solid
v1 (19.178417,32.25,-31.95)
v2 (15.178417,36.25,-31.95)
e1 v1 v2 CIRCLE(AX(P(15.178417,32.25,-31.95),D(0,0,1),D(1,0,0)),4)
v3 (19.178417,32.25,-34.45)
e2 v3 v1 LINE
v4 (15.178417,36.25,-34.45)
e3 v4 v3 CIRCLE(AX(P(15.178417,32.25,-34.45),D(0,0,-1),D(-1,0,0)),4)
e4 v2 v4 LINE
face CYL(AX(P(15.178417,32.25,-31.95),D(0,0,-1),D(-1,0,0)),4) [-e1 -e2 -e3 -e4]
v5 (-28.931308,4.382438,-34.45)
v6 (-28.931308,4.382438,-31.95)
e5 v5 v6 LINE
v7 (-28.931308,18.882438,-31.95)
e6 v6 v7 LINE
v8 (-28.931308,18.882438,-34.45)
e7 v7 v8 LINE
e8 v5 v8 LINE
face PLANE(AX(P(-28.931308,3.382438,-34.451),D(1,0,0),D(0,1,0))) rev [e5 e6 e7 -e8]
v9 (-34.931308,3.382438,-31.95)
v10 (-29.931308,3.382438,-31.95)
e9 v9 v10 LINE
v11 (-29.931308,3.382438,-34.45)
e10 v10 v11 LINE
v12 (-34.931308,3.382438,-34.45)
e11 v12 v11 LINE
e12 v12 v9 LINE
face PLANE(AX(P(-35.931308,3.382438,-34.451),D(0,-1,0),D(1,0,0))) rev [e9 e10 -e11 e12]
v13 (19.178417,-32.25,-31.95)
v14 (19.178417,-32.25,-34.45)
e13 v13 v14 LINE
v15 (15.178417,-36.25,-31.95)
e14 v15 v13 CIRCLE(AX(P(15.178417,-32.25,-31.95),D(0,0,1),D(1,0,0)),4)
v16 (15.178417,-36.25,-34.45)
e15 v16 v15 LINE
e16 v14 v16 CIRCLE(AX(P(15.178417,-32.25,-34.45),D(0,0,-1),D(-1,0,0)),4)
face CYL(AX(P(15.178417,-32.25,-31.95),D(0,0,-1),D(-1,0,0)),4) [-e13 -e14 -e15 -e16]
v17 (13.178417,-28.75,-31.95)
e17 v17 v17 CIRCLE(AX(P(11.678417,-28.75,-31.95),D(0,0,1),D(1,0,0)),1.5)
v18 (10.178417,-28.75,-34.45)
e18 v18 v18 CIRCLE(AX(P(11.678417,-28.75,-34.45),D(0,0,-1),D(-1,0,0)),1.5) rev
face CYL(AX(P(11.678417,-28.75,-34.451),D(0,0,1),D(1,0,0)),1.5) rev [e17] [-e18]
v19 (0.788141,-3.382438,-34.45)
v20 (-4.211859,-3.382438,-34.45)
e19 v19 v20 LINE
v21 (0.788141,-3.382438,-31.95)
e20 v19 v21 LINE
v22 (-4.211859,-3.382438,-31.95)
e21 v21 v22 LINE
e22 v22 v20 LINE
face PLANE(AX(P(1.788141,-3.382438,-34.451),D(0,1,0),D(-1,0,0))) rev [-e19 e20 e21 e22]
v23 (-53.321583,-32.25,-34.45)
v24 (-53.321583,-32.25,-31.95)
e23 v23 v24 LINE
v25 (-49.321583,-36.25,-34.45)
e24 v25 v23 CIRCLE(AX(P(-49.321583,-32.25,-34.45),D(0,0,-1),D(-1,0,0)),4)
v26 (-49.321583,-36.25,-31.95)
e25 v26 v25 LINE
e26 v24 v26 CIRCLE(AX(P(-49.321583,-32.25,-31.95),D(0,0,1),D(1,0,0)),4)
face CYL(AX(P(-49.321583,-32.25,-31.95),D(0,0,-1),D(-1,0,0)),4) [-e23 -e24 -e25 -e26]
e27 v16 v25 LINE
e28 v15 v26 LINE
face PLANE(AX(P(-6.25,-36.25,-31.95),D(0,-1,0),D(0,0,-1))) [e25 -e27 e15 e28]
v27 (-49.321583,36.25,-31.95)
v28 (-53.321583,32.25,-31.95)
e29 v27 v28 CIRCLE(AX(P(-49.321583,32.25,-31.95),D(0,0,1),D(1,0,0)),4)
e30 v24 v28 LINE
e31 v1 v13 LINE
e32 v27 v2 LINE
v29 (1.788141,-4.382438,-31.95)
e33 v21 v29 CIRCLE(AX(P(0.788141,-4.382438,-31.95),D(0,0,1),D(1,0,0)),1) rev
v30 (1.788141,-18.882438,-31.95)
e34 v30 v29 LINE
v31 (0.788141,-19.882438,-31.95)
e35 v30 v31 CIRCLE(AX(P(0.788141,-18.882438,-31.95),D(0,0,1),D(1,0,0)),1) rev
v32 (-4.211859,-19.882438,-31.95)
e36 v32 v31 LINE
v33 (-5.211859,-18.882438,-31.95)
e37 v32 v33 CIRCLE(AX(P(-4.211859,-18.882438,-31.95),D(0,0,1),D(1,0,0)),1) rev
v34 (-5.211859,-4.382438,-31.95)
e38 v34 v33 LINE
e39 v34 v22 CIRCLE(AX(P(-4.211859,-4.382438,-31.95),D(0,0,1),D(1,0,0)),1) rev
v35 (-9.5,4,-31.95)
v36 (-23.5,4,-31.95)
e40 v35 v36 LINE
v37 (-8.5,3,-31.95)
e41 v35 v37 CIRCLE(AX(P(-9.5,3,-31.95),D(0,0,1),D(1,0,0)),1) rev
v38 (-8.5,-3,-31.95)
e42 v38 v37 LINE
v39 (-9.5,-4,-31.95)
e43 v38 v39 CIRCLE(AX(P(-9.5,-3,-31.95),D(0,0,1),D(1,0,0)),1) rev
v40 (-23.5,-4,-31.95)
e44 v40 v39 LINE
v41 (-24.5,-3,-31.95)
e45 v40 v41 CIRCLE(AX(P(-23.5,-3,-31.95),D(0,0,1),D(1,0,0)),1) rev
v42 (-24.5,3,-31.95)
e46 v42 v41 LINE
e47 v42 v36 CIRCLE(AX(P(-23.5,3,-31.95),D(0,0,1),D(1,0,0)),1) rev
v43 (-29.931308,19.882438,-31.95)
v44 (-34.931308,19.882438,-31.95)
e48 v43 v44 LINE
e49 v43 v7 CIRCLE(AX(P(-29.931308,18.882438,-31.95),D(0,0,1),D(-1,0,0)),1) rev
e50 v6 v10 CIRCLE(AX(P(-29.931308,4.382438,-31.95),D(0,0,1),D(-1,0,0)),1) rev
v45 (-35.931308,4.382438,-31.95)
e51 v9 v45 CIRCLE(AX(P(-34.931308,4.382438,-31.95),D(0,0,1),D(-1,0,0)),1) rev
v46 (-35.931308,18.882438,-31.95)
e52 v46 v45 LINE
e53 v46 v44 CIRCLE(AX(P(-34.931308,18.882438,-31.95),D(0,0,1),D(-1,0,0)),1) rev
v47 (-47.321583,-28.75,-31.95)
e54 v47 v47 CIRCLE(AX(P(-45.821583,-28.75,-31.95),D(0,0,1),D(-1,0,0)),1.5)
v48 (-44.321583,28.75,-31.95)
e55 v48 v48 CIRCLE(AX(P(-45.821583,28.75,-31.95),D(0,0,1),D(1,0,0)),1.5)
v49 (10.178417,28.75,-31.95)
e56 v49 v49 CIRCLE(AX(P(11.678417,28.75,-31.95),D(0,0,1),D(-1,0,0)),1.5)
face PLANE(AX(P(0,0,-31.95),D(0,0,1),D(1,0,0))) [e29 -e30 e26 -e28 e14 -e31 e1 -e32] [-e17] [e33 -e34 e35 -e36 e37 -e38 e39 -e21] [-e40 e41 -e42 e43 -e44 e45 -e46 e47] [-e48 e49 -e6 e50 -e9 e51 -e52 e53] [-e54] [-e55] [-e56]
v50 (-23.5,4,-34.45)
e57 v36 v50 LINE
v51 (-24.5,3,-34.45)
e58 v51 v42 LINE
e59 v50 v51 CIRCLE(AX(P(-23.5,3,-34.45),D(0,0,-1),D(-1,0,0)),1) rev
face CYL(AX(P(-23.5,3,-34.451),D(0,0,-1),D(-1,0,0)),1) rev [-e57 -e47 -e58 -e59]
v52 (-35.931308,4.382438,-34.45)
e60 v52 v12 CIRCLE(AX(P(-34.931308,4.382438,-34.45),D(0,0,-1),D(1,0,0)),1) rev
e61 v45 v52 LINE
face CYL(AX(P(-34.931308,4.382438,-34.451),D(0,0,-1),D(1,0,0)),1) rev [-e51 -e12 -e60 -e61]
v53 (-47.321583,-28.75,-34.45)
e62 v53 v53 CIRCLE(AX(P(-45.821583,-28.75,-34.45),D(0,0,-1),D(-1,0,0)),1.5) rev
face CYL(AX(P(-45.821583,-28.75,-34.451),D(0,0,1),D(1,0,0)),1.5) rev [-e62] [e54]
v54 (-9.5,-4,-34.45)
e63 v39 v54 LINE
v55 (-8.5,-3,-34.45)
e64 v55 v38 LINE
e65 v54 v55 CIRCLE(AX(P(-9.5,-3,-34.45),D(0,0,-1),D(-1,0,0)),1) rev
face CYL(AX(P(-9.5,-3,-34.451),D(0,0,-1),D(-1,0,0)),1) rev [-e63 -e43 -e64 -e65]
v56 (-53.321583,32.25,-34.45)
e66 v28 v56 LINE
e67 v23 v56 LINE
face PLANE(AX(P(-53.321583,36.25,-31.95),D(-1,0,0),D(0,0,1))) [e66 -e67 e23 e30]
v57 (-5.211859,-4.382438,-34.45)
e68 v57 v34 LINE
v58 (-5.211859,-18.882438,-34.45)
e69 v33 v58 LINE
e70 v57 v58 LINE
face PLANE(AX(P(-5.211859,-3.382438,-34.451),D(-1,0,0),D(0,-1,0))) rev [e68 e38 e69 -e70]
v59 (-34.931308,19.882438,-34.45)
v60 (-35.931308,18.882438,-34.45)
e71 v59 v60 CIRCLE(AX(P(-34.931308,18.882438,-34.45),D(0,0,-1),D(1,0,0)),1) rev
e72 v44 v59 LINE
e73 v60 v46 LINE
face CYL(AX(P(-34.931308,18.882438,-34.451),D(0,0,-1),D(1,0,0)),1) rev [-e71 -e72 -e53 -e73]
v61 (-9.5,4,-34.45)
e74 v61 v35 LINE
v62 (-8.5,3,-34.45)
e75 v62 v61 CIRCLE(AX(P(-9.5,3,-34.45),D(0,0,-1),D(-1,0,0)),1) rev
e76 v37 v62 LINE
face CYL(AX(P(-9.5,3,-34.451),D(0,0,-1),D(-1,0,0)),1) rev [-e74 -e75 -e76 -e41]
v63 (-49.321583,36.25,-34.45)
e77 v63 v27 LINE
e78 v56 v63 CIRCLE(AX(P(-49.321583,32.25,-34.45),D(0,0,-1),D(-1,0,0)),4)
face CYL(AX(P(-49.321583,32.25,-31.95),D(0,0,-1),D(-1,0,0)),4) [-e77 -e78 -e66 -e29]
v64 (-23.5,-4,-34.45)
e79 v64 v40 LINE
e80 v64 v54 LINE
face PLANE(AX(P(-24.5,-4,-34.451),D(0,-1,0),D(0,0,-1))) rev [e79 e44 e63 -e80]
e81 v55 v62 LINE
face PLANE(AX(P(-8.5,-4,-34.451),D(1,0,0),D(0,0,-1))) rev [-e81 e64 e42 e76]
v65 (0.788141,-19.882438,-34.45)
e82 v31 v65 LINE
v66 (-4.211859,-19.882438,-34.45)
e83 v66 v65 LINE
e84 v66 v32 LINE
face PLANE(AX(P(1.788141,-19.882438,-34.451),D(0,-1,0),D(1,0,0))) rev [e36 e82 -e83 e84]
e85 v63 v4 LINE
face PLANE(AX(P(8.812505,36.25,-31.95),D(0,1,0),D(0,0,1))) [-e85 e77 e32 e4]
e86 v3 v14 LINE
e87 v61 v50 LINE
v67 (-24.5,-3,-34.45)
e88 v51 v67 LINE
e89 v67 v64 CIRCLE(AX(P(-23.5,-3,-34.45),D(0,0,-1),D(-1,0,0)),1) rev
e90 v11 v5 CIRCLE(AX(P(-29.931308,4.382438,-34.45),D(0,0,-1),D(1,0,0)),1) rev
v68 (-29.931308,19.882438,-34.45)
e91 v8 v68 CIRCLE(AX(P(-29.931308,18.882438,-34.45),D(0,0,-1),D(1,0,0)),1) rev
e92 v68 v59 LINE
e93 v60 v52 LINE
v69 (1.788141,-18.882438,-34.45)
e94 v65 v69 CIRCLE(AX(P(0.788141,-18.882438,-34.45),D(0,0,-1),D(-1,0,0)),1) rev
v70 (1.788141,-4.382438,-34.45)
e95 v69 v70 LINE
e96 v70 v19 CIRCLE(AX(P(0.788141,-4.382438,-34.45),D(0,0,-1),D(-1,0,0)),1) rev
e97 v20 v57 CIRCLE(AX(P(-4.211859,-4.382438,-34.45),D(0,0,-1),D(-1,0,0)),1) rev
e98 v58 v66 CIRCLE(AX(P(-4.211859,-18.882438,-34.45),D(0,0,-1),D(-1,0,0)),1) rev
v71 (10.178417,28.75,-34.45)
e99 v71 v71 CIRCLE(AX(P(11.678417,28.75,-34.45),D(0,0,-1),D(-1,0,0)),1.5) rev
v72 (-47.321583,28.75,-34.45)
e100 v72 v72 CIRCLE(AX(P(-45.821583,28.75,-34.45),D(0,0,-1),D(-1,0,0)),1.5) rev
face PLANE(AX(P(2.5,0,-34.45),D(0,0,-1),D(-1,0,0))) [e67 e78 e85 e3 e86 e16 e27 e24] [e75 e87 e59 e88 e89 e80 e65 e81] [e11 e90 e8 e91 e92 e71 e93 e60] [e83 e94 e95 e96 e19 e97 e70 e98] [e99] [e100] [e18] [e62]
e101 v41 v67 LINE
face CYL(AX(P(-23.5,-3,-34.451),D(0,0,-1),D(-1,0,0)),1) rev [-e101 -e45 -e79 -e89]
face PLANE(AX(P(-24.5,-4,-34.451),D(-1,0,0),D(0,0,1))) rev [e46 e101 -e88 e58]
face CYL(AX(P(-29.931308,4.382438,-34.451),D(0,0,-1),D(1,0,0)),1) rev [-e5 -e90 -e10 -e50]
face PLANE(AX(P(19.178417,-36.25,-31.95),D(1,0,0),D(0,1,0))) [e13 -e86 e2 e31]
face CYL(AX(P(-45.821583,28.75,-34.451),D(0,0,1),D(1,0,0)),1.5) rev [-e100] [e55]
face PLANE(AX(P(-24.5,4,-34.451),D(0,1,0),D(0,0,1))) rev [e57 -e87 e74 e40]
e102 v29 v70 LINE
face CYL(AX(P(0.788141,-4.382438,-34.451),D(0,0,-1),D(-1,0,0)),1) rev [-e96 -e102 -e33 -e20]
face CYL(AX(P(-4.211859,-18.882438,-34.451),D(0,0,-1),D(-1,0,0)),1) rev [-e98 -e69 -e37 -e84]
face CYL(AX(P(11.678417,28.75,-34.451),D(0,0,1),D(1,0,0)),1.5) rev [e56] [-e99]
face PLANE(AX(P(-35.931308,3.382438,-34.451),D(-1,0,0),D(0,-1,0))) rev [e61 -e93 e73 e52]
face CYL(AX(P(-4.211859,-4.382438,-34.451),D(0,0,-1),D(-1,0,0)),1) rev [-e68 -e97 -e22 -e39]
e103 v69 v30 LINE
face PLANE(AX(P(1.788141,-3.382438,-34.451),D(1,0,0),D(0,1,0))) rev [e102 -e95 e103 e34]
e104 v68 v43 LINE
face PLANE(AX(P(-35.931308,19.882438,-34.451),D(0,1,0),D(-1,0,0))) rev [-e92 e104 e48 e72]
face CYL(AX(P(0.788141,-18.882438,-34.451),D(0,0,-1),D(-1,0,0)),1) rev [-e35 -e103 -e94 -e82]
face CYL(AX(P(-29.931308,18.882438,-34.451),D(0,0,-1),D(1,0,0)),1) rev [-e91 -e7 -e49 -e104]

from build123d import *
from build123d.topology import SkipClean

# Parameters (mm, degrees)
SKETCH1_R                = 1.5
BOSS_EXTRUDE1_DEPTH      = 2.5
BOSS_EXTRUDE2_DEPTH      = 1.8
BOSS_EXTRUDE2_DEPTH_BACK = 2.5
SKETCH2_R                = 4.5
SKETCH2_R_2              = 1.5
SKETCH4_R                = 2.5
CUT_EXTRUDE1_DEPTH       = 2
BOSS_EXTRUDE3_START      = 0.75
SKETCH5_R                = 4.5
SKETCH5_R_2              = 2.5
BOSS_EXTRUDE3_DEPTH      = 0.75
BOSS_EXTRUDE4_DEPTH      = 2.5
CUT_EXTRUDE2_REACH       = 80.314
SKETCH7_R                = 1.5
SKETCH7_W                = 7
SKETCH7_H                = 16.5
SKETCH7_W_2              = 16
SKETCH7_H_2              = 8
CUT_EXTRUDE3_REACH       = 82.041
SKETCH9_W                = 2.5
SKETCH9_H                = 22.388822383
BOSS_EXTRUDE5_DEPTH      = 12.5
FILLET1_R                = 4
FILLET2_R                = 1
FILLET3_R                = 4
CUT_EXTRUDE4_DEPTH       = 74.103052287
CUT_EXTRUDE4_DEPTH_BACK  = 74.103052287
SKETCH10_W               = 26.624352611
SKETCH10_H               = 48.524798022
CIRPATTERN1_START        = -34.45
CIRPATTERN1_DEPTH        = 2.5


# Read off the part's stored shape, not the designer's step: CirPattern1
with BuildPart() as part:
    # Sketch1 → Boss-Extrude1 (new body)
    with BuildSketch(Plane(origin=(0, 0, 0), x_dir=(0, 0, -1), z_dir=(1, 0, 0))):
        with BuildLine():
            Line((0, 12.5), (34.45, 12.5))
            Line((34.45, 12.5), (34.45, -12.5))
            Line((34.45, -12.5), (0, -12.5))
            ThreePointArc((0, -12.5), (-12.5, 0), (0, 12.5))
        make_face()
        Circle(SKETCH1_R, mode=Mode.SUBTRACT)
    extrude(amount=BOSS_EXTRUDE1_DEPTH)

    # Sketch2 → Boss-Extrude2 (add, two sides: drawn at the far end of the back side and taken through both)
    with BuildSketch(Plane.ZY.offset(-BOSS_EXTRUDE2_DEPTH_BACK)):
        Circle(SKETCH2_R)
        Circle(SKETCH2_R_2, mode=Mode.SUBTRACT)
    extrude(amount=BOSS_EXTRUDE2_DEPTH + BOSS_EXTRUDE2_DEPTH_BACK)

    # Sketch4 → Cut-Extrude1 (cut)
    with BuildSketch(Plane(origin=(2.5, 0, 0), x_dir=(0, 0, -1), z_dir=(1, 0, 0))):
        Circle(SKETCH4_R)
    extrude(amount=-CUT_EXTRUDE1_DEPTH, mode=Mode.SUBTRACT)

    # Sketch5 → Boss-Extrude3 (add)
    with SkipClean():  # the faces are left unmerged after this step: merging them gives an invalid solid
        with BuildSketch(Plane(origin=(2.5, 0, 0), x_dir=(0, 0, -1), z_dir=(1, 0, 0)).offset(BOSS_EXTRUDE3_START)):
            with Locations(Location((0, 0, 0), (0, 0, 180))):
                Circle(SKETCH5_R)
            Circle(SKETCH5_R_2, mode=Mode.SUBTRACT)
        extrude(amount=-BOSS_EXTRUDE3_DEPTH)

    # Sketch6 → Boss-Extrude4 (add)
    with SkipClean():  # the faces are left unmerged after this step: merging them gives an invalid solid
        with BuildSketch(Plane(origin=(0, 0, -34.45), x_dir=(-1, 0, 0), z_dir=(0, 0, -1))):
            Polygon((-8.812505246, 36.25), (53.321583376, 36.25), (53.321583376, -36.25), (6.25, -36.25), (-19.178416624, -36.25), (-19.178416624, 36.25), align=None)
        extrude(amount=-BOSS_EXTRUDE4_DEPTH)
    add(part.part.scale(1), mode=Mode.REPLACE)  # the faces are merged on a copy

    # Sketch7 → Cut-Extrude2 (cut, up to next)
    with BuildSketch(Plane.XY.offset(-31.95), mode=Mode.PRIVATE) as cut_extrude2_sk1:
        with Locations((11.678416624, -28.75)):
            Circle(SKETCH7_R)
    cut_extrude2_tool1 = extrude(cut_extrude2_sk1.sketch, amount=-CUT_EXTRUDE2_REACH, mode=Mode.PRIVATE) & part.part
    # Sketch7 → Cut-Extrude2 (cut, up to next)
    with BuildSketch(Plane.XY.offset(-31.95), mode=Mode.PRIVATE) as cut_extrude2_sk2:
        with Locations(Location((11.678416624, 28.75, 0), (0, 0, 180))):
            Circle(SKETCH7_R)
    cut_extrude2_tool2 = extrude(cut_extrude2_sk2.sketch, amount=-CUT_EXTRUDE2_REACH, mode=Mode.PRIVATE) & part.part
    # Sketch7 → Cut-Extrude2 (cut, up to next)
    with BuildSketch(Plane.XY.offset(-31.95), mode=Mode.PRIVATE) as cut_extrude2_sk3:
        with Locations((-45.821583376, 28.75)):
            Circle(SKETCH7_R)
    cut_extrude2_tool3 = extrude(cut_extrude2_sk3.sketch, amount=-CUT_EXTRUDE2_REACH, mode=Mode.PRIVATE) & part.part
    # Sketch7 → Cut-Extrude2 (cut, up to next)
    with BuildSketch(Plane.XY.offset(-31.95), mode=Mode.PRIVATE) as cut_extrude2_sk4:
        with Locations(Location((-45.821583376, -28.75, 0), (0, 0, 180))):
            Circle(SKETCH7_R)
    cut_extrude2_tool4 = extrude(cut_extrude2_sk4.sketch, amount=-CUT_EXTRUDE2_REACH, mode=Mode.PRIVATE) & part.part
    # Sketch7 → Cut-Extrude2 (cut, up to next)
    with BuildSketch(Plane.XY.offset(-31.95), mode=Mode.PRIVATE) as cut_extrude2_sk5:
        with Locations((-1.711858899, -11.632438111)):
            Rectangle(SKETCH7_W, SKETCH7_H)
    cut_extrude2_tool5 = extrude(cut_extrude2_sk5.sketch, amount=-CUT_EXTRUDE2_REACH, mode=Mode.PRIVATE) & part.part
    # Sketch7 → Cut-Extrude2 (cut, up to next)
    with BuildSketch(Plane.XY.offset(-31.95), mode=Mode.PRIVATE) as cut_extrude2_sk6:
        with Locations((-16.5, 0)):
            Rectangle(SKETCH7_W_2, SKETCH7_H_2)
    cut_extrude2_tool6 = extrude(cut_extrude2_sk6.sketch, amount=-CUT_EXTRUDE2_REACH, mode=Mode.PRIVATE) & part.part
    add(cut_extrude2_tool1.solids().sort_by_distance((11.678417, -28.75, -31.95))[0], mode=Mode.SUBTRACT)
    add(cut_extrude2_tool2.solids().sort_by_distance((11.678417, 28.75, -31.95))[0], mode=Mode.SUBTRACT)
    add(cut_extrude2_tool3.solids().sort_by_distance((-45.821583, 28.75, -31.95))[0], mode=Mode.SUBTRACT)
    add(cut_extrude2_tool4.solids().sort_by_distance((-45.821583, -28.75, -31.95))[0], mode=Mode.SUBTRACT)
    add(cut_extrude2_tool5.solids().sort_by_distance((-1.711859, -11.632438, -31.95))[0], mode=Mode.SUBTRACT)
    add(cut_extrude2_tool6.solids().sort_by_distance((-16.5, 0, -31.95))[0], mode=Mode.SUBTRACT)

    # Sketch9 → Cut-Extrude3 (cut, up to next)
    with BuildSketch(Plane.XZ.offset(12.5), mode=Mode.PRIVATE) as cut_extrude3_sk1:
        with Locations((1.25, -20.755588809)):
            Rectangle(SKETCH9_W, SKETCH9_H)
    cut_extrude3_tool1 = extrude(cut_extrude3_sk1.sketch, amount=-CUT_EXTRUDE3_REACH, mode=Mode.PRIVATE) & part.part
    add(cut_extrude3_tool1.solids().sort_by_distance((1.25, -12.5, -20.755589))[0], mode=Mode.SUBTRACT)


with BuildPart() as cut_extrude3_piece_1:
    # of the separate pieces the step leaves, piece 1, a body of its own (cut_extrude3_pieces)
    add(part.part.solids().sort_by_distance((-53.321583376, 36.25, -31.95))[0])



with BuildPart() as cut_extrude3_piece_2:
    # of the separate pieces the step leaves, piece 2, a body of its own (cut_extrude3_pieces)
    add(part.part.solids().sort_by_distance((0, 12.5, 0))[0])


with BuildPart() as cut_extrude3_piece_1_1:
    add(cut_extrude3_piece_1.part)

    add(cut_extrude3_piece_2.part)  # Boss-Extrude5 merges Cut-Extrude3 piece 2
    # Sketch8 → Boss-Extrude5 (add, symmetric)
    with BuildSketch(Plane(origin=(0, 0, 0), x_dir=(1, 0, 0), z_dir=(0, 1, 0))):
        with BuildLine():
            Line((13.243344962, 31.95), (10.743344962, 31.95))
            Line((10.743344962, 31.95), (10.743344962, 24.009277686))
            ThreePointArc((10.743344962, 24.009277686), (9.553562393, 20.771648442), (6.550447712, 19.074849133))
            ThreePointArc((6.550447712, 19.074849133), (1.858764487, 16.423986378), (0, 11.365927519))
            Line((0, 11.365927519), (0, 9.071657281))
            Line((0, 9.071657281), (2.5, 9.071657281))
            Line((2.5, 9.071657281), (2.5, 11.666723736))
            ThreePointArc((2.5, 11.666723736), (3.641866376, 14.847101848), (6.545921975, 16.574853229))
            ThreePointArc((6.545921975, 16.574853229), (11.35315475, 19.434889059), (13.243344962, 24.69953272))
            Line((13.243344962, 24.69953272), (13.243344962, 31.95))
        make_face()
    extrude(amount=BOSS_EXTRUDE5_DEPTH, both=True)

    # Fillet1
    fillet1_edges = [cut_extrude3_piece_1_1.edges().sort_by_distance(p)[0] for p in [
        (11.993344962, -12.5, -31.95),
        (13.243344962, 0, -31.95),
        (10.743344962, 0, -31.95),
        (11.993344962, 12.5, -31.95),
    ]]
    fillet(fillet1_edges, radius=FILLET1_R)

    # Fillet2
    fillet2_edges = [cut_extrude3_piece_1_1.edges().sort_by_distance(p)[0] for p in [
        (-5.211858899, -19.882438111, -33.2),
        (-5.211858899, -3.382438111, -33.2),
        (1.788141101, -3.382438111, -33.2),
        (1.788141101, -19.882438111, -33.2),
        (-8.5, 4, -33.2),
        (-8.5, -4, -33.2),
        (-24.5, -4, -33.2),
        (-24.5, 4, -33.2),
    ]]
    fillet(fillet2_edges, radius=FILLET2_R)

    # Fillet3
    fillet3_edges = [cut_extrude3_piece_1_1.edges().sort_by_distance(p)[0] for p in [
        (19.178416624, 36.25, -33.2),
        (-53.321583376, 36.25, -33.2),
        (-53.321583376, -36.25, -33.2),
        (19.178416624, -36.25, -33.2),
    ]]
    fillet(fillet3_edges, radius=FILLET3_R)

    # Sketch10 → Cut-Extrude4 (cut, two sides: drawn at the far end of the back side and taken through both)
    with BuildSketch(Plane(origin=(0, 0, 0), x_dir=(1, 0, 0), z_dir=(0, 1, 0)).offset(-CUT_EXTRUDE4_DEPTH_BACK)):
        with Locations((4.711977851, 7.687600989)):
            Rectangle(SKETCH10_W, SKETCH10_H)
    extrude(amount=CUT_EXTRUDE4_DEPTH + CUT_EXTRUDE4_DEPTH_BACK, mode=Mode.SUBTRACT)

    # CirPattern1 outline → CirPattern1 (cut)
    with BuildSketch(Plane.XY.offset(CIRPATTERN1_START)):
        with BuildLine():
            ThreePointArc((-28.931307853, 18.882438111), (-29.224201072, 19.589544892), (-29.931307853, 19.882438111))
            Line((-29.931307853, 19.882438111), (-34.931307853, 19.882438111))
            ThreePointArc((-34.931307853, 19.882438111), (-35.638414634, 19.589544892), (-35.931307853, 18.882438111))
            Line((-35.931307853, 18.882438111), (-35.931307853, 4.382438111))
            ThreePointArc((-35.931307853, 4.382438111), (-35.638414634, 3.67533133), (-34.931307853, 3.382438111))
            Line((-34.931307853, 3.382438111), (-29.931307853, 3.382438111))
            ThreePointArc((-29.931307853, 3.382438111), (-29.224201072, 3.67533133), (-28.931307853, 4.382438111))
            Line((-28.931307853, 4.382438111), (-28.931307853, 18.882438111))
        make_face()
    extrude(amount=CIRPATTERN1_DEPTH, mode=Mode.SUBTRACT)


solid = cut_extrude3_piece_1_1.part
